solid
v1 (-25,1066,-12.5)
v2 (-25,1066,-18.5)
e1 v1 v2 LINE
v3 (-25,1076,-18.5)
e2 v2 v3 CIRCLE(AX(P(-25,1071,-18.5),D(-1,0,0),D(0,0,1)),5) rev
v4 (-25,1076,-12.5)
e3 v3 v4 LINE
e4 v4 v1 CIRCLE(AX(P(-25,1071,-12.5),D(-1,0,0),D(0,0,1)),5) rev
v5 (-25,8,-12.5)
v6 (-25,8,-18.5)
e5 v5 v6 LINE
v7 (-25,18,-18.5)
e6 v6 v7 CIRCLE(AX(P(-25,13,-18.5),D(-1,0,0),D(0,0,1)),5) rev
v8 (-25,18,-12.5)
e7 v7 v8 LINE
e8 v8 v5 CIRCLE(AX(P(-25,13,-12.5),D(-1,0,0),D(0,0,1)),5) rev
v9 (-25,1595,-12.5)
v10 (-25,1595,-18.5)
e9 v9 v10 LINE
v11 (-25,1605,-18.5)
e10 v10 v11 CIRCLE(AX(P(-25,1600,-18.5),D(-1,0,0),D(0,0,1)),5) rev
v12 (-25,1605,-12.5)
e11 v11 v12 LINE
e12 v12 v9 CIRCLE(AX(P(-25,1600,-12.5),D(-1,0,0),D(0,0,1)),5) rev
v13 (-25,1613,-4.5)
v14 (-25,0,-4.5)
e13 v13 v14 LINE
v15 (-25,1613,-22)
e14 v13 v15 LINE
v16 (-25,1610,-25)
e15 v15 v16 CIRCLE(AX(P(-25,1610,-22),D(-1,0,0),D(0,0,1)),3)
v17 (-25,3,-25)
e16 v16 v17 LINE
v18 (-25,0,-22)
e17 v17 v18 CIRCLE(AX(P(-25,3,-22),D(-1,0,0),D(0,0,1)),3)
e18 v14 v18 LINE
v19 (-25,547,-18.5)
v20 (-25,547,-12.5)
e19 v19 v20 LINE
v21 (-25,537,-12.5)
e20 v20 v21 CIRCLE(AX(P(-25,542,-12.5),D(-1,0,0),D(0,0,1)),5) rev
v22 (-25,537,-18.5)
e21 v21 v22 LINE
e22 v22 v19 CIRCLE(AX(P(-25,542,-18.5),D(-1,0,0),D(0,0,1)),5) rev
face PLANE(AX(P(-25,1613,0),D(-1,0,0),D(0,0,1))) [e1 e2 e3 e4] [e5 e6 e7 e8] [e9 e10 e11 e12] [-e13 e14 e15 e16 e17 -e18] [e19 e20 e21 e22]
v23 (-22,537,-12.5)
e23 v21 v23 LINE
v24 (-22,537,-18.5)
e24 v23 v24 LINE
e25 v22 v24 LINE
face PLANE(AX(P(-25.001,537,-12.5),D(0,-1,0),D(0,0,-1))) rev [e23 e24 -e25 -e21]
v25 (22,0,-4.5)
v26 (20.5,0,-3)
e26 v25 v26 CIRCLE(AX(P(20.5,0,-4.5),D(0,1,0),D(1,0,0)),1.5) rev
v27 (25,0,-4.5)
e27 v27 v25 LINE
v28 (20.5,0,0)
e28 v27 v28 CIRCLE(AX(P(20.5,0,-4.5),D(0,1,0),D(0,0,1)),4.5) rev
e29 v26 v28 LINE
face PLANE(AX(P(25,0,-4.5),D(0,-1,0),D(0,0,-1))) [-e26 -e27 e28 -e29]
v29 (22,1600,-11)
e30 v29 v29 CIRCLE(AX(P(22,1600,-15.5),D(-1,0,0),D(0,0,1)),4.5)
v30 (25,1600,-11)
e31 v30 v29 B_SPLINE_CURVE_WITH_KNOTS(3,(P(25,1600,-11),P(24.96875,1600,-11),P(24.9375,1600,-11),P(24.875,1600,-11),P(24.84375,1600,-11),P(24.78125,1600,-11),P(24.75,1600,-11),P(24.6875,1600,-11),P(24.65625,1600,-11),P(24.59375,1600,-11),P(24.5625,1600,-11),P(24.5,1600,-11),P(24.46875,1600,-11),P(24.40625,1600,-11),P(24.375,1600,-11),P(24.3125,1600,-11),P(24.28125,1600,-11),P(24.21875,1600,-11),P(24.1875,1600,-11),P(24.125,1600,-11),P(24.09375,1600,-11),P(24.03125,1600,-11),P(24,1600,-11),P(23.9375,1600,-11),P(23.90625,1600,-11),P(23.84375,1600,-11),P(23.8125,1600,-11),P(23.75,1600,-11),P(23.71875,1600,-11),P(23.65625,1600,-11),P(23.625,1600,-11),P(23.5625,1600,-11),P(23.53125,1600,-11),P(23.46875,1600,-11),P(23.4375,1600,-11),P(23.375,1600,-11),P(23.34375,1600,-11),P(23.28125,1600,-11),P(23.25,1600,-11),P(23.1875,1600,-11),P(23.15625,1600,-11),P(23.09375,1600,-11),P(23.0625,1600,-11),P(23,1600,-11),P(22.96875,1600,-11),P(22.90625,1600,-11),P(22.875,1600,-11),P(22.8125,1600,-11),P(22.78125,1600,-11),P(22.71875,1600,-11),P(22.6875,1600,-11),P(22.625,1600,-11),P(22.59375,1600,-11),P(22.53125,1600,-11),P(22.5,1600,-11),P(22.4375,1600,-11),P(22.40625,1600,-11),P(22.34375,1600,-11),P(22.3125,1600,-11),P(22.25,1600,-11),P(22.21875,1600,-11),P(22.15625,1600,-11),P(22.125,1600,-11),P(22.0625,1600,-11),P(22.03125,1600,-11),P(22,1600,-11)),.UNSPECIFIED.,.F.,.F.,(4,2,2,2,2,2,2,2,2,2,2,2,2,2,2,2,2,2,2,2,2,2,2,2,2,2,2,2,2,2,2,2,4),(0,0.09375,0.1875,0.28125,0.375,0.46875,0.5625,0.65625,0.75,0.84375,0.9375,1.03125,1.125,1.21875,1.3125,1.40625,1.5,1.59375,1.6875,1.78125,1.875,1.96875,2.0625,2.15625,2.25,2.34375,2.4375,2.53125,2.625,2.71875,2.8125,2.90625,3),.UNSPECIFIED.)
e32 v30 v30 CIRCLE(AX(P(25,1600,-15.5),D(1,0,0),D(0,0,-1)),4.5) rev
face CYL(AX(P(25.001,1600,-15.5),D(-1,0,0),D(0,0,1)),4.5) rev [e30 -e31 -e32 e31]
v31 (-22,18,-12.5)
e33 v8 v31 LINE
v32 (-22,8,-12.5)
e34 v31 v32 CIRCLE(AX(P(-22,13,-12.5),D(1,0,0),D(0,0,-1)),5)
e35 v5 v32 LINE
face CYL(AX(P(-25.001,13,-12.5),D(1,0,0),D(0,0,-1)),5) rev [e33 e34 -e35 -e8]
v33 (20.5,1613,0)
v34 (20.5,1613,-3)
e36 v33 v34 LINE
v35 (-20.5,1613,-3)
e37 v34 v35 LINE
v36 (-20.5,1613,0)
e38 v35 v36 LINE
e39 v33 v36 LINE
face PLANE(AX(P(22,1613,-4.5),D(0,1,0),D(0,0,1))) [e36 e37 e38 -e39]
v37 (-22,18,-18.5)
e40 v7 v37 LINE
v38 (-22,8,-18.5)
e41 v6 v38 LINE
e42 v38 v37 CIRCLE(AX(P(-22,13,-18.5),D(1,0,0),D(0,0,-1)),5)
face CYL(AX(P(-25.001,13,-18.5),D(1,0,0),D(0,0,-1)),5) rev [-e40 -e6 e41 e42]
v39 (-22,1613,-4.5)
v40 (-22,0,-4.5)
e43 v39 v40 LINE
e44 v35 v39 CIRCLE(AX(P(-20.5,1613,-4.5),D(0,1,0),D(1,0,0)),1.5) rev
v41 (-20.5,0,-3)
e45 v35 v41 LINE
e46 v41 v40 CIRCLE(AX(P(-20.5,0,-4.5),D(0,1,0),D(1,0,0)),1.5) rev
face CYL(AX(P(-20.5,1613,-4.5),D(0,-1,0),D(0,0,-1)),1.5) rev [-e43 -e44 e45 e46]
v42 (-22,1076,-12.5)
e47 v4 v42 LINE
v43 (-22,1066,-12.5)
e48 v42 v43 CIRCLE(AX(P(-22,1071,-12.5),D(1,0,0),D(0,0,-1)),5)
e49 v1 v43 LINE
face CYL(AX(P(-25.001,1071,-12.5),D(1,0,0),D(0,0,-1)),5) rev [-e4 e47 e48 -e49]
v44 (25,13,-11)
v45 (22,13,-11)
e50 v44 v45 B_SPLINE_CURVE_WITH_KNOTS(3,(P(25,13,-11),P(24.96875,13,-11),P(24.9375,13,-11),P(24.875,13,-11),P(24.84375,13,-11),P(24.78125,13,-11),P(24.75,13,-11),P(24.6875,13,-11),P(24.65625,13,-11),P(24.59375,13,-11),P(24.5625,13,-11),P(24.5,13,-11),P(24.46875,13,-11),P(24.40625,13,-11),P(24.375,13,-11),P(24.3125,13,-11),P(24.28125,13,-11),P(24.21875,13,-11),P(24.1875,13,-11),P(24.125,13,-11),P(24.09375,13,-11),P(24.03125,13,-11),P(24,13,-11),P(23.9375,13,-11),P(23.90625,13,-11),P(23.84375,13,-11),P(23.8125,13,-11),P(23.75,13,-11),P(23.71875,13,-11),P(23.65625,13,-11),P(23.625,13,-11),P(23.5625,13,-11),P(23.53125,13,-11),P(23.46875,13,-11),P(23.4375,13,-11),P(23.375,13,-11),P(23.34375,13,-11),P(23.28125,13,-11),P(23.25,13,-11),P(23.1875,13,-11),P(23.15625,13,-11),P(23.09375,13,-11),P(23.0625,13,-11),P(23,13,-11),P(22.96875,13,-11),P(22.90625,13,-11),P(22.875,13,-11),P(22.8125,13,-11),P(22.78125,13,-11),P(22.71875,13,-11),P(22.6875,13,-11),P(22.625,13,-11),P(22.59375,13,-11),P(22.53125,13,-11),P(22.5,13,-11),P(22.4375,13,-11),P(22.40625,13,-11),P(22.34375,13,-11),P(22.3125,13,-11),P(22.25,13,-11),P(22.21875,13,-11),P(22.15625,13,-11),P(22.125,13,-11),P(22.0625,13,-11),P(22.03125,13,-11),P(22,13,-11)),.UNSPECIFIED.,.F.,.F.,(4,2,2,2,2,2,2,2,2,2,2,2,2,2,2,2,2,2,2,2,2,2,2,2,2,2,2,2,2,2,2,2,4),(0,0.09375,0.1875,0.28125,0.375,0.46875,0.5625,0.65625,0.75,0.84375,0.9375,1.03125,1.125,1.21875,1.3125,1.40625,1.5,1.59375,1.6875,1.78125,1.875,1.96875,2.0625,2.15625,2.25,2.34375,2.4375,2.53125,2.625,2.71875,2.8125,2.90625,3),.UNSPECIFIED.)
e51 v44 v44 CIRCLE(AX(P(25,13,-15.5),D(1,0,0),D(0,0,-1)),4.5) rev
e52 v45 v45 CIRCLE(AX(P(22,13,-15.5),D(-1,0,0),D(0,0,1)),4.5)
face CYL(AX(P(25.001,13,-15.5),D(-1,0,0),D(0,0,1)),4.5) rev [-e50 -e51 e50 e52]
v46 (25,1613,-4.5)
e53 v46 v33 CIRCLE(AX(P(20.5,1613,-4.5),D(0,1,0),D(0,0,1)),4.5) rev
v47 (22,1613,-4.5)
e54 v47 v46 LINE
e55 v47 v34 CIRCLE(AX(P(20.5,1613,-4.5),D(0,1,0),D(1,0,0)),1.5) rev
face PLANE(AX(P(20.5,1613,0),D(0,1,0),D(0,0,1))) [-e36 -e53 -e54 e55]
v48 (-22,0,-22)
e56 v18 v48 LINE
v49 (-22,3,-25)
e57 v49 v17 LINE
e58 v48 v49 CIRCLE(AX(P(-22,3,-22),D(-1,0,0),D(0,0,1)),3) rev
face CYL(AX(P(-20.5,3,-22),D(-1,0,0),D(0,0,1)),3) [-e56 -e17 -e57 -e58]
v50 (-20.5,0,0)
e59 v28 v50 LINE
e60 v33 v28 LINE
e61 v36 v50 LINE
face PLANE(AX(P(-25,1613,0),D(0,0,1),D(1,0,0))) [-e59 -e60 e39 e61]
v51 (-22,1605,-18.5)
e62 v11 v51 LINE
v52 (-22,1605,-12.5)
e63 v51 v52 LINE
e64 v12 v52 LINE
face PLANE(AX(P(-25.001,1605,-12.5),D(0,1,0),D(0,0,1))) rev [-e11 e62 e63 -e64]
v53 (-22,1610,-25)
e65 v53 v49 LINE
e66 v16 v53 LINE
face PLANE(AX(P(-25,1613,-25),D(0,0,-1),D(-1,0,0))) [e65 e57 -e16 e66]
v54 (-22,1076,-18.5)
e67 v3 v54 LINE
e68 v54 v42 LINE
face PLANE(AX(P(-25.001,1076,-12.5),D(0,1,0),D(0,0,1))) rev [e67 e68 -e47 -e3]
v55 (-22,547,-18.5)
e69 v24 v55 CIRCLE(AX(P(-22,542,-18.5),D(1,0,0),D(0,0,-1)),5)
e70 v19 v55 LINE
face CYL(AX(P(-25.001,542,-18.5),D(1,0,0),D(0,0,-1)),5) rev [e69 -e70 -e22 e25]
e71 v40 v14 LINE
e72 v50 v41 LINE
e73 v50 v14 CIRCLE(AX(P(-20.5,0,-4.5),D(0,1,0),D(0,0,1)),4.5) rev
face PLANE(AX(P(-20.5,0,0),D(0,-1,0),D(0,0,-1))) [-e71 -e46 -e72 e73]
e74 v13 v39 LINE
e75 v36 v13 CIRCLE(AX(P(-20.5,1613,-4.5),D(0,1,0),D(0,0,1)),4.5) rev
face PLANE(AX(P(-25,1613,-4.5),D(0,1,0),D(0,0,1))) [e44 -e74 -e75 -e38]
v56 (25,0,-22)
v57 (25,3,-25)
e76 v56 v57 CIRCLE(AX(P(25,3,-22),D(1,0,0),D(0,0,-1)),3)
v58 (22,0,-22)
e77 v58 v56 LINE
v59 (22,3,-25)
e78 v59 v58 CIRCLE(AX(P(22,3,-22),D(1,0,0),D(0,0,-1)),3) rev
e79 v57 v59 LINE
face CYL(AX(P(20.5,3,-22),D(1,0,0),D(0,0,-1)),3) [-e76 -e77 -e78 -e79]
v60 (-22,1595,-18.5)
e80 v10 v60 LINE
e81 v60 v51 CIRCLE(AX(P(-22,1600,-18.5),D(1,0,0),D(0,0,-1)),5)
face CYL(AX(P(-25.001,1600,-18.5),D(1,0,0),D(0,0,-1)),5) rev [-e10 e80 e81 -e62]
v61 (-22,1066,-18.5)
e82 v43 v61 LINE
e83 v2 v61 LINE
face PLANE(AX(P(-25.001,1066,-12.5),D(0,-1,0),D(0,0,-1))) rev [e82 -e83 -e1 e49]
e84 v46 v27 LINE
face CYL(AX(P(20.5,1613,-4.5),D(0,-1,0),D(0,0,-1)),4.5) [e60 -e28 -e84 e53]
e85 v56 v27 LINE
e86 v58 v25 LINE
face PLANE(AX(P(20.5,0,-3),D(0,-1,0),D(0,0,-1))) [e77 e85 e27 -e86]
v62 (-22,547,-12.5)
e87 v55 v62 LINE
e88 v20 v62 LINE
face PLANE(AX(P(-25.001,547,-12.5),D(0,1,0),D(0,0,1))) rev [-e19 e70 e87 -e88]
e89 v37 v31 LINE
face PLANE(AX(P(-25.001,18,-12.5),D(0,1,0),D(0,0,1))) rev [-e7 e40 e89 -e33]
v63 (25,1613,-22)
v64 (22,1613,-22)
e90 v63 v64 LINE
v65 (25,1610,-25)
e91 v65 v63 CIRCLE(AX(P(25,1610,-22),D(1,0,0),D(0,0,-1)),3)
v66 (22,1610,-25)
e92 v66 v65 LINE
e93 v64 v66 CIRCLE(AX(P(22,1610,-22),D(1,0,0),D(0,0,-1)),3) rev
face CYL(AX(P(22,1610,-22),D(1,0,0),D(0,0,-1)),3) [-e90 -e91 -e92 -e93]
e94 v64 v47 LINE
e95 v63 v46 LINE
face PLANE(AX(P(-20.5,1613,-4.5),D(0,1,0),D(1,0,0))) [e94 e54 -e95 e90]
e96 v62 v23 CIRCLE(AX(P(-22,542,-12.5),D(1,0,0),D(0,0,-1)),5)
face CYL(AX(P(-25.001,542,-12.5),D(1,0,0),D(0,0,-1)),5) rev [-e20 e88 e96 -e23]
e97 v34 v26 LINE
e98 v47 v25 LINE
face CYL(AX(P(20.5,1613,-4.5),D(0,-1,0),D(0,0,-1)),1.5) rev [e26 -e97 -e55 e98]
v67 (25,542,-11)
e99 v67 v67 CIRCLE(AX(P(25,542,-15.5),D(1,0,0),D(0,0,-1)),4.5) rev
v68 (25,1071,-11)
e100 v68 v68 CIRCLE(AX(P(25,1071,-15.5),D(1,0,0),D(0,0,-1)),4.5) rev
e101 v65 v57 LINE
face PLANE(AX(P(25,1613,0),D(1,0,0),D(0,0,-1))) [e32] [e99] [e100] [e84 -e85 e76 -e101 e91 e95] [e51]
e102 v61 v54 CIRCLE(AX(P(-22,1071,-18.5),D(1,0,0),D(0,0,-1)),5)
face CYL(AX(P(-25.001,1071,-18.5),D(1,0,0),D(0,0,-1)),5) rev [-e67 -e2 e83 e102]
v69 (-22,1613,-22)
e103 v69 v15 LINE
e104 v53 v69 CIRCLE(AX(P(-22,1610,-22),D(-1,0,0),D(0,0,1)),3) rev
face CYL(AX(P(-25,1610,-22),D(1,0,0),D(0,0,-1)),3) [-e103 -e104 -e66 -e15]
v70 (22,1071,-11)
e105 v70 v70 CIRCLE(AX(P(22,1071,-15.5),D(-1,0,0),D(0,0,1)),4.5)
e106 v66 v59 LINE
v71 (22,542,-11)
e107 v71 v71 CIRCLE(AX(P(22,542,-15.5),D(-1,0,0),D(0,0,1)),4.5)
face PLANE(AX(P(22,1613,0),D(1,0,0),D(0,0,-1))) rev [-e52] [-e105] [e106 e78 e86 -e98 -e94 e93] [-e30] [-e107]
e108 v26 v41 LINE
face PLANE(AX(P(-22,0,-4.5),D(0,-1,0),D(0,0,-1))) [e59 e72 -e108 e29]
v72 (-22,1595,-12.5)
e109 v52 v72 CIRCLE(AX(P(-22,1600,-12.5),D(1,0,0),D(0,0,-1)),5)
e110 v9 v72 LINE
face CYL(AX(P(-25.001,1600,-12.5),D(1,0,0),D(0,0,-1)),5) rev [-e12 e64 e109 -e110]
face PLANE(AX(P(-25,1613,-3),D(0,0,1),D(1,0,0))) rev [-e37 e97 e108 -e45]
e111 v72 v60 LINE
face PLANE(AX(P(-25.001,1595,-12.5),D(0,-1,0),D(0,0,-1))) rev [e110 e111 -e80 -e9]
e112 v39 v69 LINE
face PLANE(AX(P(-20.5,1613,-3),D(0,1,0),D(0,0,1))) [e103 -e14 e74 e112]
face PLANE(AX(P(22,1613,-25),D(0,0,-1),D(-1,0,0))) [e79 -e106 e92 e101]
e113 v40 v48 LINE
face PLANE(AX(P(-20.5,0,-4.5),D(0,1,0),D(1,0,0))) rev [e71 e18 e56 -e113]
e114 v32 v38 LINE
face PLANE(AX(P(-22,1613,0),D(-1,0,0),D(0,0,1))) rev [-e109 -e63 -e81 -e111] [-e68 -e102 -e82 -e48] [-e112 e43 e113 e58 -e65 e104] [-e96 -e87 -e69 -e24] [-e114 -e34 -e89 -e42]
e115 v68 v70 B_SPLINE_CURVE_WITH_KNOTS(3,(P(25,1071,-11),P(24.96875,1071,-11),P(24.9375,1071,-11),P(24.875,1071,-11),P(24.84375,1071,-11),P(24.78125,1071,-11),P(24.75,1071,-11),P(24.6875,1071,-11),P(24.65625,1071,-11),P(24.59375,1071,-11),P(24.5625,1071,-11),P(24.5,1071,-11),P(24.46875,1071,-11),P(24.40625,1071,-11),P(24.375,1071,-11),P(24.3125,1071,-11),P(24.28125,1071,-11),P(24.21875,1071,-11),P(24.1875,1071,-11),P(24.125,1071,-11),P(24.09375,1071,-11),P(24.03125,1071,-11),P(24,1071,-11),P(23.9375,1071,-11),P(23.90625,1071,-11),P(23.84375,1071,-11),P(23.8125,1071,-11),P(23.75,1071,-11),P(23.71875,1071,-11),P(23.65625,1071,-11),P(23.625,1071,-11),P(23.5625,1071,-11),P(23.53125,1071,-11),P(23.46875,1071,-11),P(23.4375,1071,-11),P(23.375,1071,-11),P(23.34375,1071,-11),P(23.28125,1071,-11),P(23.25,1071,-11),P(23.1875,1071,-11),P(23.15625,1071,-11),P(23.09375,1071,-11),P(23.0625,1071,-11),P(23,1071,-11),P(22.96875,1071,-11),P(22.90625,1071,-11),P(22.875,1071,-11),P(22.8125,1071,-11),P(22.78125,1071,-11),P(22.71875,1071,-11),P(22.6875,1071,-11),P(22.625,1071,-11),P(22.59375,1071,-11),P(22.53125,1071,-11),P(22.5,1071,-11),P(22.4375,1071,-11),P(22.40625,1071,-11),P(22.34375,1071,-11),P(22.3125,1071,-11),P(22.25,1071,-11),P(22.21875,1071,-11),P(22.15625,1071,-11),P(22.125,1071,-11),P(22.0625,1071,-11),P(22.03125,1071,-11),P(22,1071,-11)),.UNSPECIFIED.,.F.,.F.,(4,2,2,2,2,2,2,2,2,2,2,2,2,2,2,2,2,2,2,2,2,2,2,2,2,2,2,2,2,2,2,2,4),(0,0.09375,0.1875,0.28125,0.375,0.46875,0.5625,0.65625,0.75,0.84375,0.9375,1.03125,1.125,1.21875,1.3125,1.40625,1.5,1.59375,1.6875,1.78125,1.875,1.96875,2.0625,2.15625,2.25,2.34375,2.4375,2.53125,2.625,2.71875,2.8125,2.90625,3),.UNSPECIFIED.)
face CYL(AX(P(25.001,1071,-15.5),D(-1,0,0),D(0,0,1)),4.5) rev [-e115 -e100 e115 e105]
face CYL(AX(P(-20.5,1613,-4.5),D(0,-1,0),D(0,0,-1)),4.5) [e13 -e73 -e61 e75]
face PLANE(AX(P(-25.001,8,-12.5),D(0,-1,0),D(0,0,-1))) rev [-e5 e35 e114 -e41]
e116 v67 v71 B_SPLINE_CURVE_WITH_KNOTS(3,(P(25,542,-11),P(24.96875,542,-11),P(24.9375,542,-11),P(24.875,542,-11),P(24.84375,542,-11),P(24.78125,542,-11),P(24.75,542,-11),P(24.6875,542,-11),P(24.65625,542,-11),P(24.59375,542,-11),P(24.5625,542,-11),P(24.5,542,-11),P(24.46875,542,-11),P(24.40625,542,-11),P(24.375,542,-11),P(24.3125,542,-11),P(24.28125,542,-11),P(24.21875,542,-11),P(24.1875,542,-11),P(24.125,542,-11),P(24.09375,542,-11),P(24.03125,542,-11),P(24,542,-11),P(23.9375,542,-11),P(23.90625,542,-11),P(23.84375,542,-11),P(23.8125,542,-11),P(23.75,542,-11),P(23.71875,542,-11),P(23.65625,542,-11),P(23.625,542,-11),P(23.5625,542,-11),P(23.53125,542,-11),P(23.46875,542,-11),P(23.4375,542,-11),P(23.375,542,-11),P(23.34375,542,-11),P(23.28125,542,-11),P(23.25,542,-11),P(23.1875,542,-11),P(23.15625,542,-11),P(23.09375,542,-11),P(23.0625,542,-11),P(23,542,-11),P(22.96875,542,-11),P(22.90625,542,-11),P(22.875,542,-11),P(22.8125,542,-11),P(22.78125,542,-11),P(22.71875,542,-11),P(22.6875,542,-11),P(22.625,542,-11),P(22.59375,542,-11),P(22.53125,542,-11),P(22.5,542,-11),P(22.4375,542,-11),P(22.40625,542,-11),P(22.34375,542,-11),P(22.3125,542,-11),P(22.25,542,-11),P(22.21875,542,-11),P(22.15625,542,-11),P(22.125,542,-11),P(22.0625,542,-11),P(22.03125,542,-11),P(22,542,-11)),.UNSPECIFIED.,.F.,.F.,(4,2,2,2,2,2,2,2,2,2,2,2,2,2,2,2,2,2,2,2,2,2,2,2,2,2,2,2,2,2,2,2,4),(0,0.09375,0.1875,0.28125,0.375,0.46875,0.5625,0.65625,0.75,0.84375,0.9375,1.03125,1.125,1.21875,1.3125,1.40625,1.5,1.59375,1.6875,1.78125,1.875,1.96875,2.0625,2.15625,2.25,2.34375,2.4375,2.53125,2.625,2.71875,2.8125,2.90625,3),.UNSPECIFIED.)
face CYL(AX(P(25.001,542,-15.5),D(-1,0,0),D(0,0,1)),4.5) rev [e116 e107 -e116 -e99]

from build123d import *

# Parameters (mm, degrees)
BASE_FLANGE1_DEPTH = 1613
CUT_EXTRUDE1_REACH = 1615.878
FILLET1_R          = 3
CUT_EXTRUDE2_REACH = 1615.878
SKETCH7_R          = 4.5
LPATTERN1_COUNT    = 4
LPATTERN1_PITCH    = 529


# Sheet-metal steps are written as plain solids
with BuildPart() as part:
    # Sketch1 → Base-Flange1 (new body)
    with BuildSketch(Plane(origin=(0, 0, 0), x_dir=(1, 0, 0), z_dir=(0, 1, 0))):
        with BuildLine():
            Line((-25, 25), (-25, 4.5))
            ThreePointArc((-25, 4.5), (-23.681980515, 1.318019485), (-20.5, 0))
            Line((-20.5, 0), (20.5, 0))
            ThreePointArc((20.5, 0), (23.681980515, 1.318019485), (25, 4.5))
            Line((25, 4.5), (25, 25))
            Line((25, 25), (22, 25))
            Line((22, 25), (22, 4.5))
            ThreePointArc((22, 4.5), (21.560660172, 3.439339828), (20.5, 3))
            Line((20.5, 3), (-20.5, 3))
            ThreePointArc((-20.5, 3), (-21.560660172, 3.439339828), (-22, 4.5))
            Line((-22, 4.5), (-22, 25))
            Line((-22, 25), (-25, 25))
        make_face()
    extrude(amount=BASE_FLANGE1_DEPTH)

    # Sketch6 → Cut-Extrude1 (cut, up to next)
    with BuildSketch(Plane(origin=(-22, 0, 0), x_dir=(0, 0, -1), z_dir=(1, 0, 0)), mode=Mode.PRIVATE) as cut_extrude1_sk1:
        with BuildLine():
            Line((12.5, 18), (18.5, 18))
            ThreePointArc((18.5, 18), (23.5, 13), (18.5, 8))
            Line((18.5, 8), (12.5, 8))
            ThreePointArc((12.5, 8), (7.5, 13), (12.5, 18))
        make_face()
    cut_extrude1_tool1 = extrude(cut_extrude1_sk1.sketch, amount=-CUT_EXTRUDE1_REACH, mode=Mode.PRIVATE) & part.part
    cut_extrude1 = cut_extrude1_tool1.solids().sort_by_distance((-22, 13, -15.5))[0]
    add(cut_extrude1, mode=Mode.SUBTRACT)

    # Fillet1
    fillet1_edges = [part.edges().sort_by_distance(p)[0] for p in [
        (23.5, 0, -25),
        (-23.5, 0, -25),
        (23.5, 1613, -25),
        (-23.5, 1613, -25),
    ]]
    fillet(fillet1_edges, radius=FILLET1_R)

    # Sketch7 → Cut-Extrude2 (cut, up to next)
    with BuildSketch(Plane.ZY.offset(-22), mode=Mode.PRIVATE) as cut_extrude2_sk1:
        with Locations((-15.5, 13)):
            Circle(SKETCH7_R)
    cut_extrude2_tool1 = extrude(cut_extrude2_sk1.sketch, amount=-CUT_EXTRUDE2_REACH, mode=Mode.PRIVATE) & part.part
    cut_extrude2 = cut_extrude2_tool1.solids().sort_by_distance((22, 13, -15.5))[0]
    add(cut_extrude2, mode=Mode.SUBTRACT)

    # LPattern1: Cut-Extrude1, Cut-Extrude2 ×4
    with Locations(*[(0, i * LPATTERN1_PITCH, 0) for i in range(1, LPATTERN1_COUNT)]):
        add(cut_extrude1, mode=Mode.SUBTRACT)
        add(cut_extrude2, mode=Mode.SUBTRACT)


solid = part.part
